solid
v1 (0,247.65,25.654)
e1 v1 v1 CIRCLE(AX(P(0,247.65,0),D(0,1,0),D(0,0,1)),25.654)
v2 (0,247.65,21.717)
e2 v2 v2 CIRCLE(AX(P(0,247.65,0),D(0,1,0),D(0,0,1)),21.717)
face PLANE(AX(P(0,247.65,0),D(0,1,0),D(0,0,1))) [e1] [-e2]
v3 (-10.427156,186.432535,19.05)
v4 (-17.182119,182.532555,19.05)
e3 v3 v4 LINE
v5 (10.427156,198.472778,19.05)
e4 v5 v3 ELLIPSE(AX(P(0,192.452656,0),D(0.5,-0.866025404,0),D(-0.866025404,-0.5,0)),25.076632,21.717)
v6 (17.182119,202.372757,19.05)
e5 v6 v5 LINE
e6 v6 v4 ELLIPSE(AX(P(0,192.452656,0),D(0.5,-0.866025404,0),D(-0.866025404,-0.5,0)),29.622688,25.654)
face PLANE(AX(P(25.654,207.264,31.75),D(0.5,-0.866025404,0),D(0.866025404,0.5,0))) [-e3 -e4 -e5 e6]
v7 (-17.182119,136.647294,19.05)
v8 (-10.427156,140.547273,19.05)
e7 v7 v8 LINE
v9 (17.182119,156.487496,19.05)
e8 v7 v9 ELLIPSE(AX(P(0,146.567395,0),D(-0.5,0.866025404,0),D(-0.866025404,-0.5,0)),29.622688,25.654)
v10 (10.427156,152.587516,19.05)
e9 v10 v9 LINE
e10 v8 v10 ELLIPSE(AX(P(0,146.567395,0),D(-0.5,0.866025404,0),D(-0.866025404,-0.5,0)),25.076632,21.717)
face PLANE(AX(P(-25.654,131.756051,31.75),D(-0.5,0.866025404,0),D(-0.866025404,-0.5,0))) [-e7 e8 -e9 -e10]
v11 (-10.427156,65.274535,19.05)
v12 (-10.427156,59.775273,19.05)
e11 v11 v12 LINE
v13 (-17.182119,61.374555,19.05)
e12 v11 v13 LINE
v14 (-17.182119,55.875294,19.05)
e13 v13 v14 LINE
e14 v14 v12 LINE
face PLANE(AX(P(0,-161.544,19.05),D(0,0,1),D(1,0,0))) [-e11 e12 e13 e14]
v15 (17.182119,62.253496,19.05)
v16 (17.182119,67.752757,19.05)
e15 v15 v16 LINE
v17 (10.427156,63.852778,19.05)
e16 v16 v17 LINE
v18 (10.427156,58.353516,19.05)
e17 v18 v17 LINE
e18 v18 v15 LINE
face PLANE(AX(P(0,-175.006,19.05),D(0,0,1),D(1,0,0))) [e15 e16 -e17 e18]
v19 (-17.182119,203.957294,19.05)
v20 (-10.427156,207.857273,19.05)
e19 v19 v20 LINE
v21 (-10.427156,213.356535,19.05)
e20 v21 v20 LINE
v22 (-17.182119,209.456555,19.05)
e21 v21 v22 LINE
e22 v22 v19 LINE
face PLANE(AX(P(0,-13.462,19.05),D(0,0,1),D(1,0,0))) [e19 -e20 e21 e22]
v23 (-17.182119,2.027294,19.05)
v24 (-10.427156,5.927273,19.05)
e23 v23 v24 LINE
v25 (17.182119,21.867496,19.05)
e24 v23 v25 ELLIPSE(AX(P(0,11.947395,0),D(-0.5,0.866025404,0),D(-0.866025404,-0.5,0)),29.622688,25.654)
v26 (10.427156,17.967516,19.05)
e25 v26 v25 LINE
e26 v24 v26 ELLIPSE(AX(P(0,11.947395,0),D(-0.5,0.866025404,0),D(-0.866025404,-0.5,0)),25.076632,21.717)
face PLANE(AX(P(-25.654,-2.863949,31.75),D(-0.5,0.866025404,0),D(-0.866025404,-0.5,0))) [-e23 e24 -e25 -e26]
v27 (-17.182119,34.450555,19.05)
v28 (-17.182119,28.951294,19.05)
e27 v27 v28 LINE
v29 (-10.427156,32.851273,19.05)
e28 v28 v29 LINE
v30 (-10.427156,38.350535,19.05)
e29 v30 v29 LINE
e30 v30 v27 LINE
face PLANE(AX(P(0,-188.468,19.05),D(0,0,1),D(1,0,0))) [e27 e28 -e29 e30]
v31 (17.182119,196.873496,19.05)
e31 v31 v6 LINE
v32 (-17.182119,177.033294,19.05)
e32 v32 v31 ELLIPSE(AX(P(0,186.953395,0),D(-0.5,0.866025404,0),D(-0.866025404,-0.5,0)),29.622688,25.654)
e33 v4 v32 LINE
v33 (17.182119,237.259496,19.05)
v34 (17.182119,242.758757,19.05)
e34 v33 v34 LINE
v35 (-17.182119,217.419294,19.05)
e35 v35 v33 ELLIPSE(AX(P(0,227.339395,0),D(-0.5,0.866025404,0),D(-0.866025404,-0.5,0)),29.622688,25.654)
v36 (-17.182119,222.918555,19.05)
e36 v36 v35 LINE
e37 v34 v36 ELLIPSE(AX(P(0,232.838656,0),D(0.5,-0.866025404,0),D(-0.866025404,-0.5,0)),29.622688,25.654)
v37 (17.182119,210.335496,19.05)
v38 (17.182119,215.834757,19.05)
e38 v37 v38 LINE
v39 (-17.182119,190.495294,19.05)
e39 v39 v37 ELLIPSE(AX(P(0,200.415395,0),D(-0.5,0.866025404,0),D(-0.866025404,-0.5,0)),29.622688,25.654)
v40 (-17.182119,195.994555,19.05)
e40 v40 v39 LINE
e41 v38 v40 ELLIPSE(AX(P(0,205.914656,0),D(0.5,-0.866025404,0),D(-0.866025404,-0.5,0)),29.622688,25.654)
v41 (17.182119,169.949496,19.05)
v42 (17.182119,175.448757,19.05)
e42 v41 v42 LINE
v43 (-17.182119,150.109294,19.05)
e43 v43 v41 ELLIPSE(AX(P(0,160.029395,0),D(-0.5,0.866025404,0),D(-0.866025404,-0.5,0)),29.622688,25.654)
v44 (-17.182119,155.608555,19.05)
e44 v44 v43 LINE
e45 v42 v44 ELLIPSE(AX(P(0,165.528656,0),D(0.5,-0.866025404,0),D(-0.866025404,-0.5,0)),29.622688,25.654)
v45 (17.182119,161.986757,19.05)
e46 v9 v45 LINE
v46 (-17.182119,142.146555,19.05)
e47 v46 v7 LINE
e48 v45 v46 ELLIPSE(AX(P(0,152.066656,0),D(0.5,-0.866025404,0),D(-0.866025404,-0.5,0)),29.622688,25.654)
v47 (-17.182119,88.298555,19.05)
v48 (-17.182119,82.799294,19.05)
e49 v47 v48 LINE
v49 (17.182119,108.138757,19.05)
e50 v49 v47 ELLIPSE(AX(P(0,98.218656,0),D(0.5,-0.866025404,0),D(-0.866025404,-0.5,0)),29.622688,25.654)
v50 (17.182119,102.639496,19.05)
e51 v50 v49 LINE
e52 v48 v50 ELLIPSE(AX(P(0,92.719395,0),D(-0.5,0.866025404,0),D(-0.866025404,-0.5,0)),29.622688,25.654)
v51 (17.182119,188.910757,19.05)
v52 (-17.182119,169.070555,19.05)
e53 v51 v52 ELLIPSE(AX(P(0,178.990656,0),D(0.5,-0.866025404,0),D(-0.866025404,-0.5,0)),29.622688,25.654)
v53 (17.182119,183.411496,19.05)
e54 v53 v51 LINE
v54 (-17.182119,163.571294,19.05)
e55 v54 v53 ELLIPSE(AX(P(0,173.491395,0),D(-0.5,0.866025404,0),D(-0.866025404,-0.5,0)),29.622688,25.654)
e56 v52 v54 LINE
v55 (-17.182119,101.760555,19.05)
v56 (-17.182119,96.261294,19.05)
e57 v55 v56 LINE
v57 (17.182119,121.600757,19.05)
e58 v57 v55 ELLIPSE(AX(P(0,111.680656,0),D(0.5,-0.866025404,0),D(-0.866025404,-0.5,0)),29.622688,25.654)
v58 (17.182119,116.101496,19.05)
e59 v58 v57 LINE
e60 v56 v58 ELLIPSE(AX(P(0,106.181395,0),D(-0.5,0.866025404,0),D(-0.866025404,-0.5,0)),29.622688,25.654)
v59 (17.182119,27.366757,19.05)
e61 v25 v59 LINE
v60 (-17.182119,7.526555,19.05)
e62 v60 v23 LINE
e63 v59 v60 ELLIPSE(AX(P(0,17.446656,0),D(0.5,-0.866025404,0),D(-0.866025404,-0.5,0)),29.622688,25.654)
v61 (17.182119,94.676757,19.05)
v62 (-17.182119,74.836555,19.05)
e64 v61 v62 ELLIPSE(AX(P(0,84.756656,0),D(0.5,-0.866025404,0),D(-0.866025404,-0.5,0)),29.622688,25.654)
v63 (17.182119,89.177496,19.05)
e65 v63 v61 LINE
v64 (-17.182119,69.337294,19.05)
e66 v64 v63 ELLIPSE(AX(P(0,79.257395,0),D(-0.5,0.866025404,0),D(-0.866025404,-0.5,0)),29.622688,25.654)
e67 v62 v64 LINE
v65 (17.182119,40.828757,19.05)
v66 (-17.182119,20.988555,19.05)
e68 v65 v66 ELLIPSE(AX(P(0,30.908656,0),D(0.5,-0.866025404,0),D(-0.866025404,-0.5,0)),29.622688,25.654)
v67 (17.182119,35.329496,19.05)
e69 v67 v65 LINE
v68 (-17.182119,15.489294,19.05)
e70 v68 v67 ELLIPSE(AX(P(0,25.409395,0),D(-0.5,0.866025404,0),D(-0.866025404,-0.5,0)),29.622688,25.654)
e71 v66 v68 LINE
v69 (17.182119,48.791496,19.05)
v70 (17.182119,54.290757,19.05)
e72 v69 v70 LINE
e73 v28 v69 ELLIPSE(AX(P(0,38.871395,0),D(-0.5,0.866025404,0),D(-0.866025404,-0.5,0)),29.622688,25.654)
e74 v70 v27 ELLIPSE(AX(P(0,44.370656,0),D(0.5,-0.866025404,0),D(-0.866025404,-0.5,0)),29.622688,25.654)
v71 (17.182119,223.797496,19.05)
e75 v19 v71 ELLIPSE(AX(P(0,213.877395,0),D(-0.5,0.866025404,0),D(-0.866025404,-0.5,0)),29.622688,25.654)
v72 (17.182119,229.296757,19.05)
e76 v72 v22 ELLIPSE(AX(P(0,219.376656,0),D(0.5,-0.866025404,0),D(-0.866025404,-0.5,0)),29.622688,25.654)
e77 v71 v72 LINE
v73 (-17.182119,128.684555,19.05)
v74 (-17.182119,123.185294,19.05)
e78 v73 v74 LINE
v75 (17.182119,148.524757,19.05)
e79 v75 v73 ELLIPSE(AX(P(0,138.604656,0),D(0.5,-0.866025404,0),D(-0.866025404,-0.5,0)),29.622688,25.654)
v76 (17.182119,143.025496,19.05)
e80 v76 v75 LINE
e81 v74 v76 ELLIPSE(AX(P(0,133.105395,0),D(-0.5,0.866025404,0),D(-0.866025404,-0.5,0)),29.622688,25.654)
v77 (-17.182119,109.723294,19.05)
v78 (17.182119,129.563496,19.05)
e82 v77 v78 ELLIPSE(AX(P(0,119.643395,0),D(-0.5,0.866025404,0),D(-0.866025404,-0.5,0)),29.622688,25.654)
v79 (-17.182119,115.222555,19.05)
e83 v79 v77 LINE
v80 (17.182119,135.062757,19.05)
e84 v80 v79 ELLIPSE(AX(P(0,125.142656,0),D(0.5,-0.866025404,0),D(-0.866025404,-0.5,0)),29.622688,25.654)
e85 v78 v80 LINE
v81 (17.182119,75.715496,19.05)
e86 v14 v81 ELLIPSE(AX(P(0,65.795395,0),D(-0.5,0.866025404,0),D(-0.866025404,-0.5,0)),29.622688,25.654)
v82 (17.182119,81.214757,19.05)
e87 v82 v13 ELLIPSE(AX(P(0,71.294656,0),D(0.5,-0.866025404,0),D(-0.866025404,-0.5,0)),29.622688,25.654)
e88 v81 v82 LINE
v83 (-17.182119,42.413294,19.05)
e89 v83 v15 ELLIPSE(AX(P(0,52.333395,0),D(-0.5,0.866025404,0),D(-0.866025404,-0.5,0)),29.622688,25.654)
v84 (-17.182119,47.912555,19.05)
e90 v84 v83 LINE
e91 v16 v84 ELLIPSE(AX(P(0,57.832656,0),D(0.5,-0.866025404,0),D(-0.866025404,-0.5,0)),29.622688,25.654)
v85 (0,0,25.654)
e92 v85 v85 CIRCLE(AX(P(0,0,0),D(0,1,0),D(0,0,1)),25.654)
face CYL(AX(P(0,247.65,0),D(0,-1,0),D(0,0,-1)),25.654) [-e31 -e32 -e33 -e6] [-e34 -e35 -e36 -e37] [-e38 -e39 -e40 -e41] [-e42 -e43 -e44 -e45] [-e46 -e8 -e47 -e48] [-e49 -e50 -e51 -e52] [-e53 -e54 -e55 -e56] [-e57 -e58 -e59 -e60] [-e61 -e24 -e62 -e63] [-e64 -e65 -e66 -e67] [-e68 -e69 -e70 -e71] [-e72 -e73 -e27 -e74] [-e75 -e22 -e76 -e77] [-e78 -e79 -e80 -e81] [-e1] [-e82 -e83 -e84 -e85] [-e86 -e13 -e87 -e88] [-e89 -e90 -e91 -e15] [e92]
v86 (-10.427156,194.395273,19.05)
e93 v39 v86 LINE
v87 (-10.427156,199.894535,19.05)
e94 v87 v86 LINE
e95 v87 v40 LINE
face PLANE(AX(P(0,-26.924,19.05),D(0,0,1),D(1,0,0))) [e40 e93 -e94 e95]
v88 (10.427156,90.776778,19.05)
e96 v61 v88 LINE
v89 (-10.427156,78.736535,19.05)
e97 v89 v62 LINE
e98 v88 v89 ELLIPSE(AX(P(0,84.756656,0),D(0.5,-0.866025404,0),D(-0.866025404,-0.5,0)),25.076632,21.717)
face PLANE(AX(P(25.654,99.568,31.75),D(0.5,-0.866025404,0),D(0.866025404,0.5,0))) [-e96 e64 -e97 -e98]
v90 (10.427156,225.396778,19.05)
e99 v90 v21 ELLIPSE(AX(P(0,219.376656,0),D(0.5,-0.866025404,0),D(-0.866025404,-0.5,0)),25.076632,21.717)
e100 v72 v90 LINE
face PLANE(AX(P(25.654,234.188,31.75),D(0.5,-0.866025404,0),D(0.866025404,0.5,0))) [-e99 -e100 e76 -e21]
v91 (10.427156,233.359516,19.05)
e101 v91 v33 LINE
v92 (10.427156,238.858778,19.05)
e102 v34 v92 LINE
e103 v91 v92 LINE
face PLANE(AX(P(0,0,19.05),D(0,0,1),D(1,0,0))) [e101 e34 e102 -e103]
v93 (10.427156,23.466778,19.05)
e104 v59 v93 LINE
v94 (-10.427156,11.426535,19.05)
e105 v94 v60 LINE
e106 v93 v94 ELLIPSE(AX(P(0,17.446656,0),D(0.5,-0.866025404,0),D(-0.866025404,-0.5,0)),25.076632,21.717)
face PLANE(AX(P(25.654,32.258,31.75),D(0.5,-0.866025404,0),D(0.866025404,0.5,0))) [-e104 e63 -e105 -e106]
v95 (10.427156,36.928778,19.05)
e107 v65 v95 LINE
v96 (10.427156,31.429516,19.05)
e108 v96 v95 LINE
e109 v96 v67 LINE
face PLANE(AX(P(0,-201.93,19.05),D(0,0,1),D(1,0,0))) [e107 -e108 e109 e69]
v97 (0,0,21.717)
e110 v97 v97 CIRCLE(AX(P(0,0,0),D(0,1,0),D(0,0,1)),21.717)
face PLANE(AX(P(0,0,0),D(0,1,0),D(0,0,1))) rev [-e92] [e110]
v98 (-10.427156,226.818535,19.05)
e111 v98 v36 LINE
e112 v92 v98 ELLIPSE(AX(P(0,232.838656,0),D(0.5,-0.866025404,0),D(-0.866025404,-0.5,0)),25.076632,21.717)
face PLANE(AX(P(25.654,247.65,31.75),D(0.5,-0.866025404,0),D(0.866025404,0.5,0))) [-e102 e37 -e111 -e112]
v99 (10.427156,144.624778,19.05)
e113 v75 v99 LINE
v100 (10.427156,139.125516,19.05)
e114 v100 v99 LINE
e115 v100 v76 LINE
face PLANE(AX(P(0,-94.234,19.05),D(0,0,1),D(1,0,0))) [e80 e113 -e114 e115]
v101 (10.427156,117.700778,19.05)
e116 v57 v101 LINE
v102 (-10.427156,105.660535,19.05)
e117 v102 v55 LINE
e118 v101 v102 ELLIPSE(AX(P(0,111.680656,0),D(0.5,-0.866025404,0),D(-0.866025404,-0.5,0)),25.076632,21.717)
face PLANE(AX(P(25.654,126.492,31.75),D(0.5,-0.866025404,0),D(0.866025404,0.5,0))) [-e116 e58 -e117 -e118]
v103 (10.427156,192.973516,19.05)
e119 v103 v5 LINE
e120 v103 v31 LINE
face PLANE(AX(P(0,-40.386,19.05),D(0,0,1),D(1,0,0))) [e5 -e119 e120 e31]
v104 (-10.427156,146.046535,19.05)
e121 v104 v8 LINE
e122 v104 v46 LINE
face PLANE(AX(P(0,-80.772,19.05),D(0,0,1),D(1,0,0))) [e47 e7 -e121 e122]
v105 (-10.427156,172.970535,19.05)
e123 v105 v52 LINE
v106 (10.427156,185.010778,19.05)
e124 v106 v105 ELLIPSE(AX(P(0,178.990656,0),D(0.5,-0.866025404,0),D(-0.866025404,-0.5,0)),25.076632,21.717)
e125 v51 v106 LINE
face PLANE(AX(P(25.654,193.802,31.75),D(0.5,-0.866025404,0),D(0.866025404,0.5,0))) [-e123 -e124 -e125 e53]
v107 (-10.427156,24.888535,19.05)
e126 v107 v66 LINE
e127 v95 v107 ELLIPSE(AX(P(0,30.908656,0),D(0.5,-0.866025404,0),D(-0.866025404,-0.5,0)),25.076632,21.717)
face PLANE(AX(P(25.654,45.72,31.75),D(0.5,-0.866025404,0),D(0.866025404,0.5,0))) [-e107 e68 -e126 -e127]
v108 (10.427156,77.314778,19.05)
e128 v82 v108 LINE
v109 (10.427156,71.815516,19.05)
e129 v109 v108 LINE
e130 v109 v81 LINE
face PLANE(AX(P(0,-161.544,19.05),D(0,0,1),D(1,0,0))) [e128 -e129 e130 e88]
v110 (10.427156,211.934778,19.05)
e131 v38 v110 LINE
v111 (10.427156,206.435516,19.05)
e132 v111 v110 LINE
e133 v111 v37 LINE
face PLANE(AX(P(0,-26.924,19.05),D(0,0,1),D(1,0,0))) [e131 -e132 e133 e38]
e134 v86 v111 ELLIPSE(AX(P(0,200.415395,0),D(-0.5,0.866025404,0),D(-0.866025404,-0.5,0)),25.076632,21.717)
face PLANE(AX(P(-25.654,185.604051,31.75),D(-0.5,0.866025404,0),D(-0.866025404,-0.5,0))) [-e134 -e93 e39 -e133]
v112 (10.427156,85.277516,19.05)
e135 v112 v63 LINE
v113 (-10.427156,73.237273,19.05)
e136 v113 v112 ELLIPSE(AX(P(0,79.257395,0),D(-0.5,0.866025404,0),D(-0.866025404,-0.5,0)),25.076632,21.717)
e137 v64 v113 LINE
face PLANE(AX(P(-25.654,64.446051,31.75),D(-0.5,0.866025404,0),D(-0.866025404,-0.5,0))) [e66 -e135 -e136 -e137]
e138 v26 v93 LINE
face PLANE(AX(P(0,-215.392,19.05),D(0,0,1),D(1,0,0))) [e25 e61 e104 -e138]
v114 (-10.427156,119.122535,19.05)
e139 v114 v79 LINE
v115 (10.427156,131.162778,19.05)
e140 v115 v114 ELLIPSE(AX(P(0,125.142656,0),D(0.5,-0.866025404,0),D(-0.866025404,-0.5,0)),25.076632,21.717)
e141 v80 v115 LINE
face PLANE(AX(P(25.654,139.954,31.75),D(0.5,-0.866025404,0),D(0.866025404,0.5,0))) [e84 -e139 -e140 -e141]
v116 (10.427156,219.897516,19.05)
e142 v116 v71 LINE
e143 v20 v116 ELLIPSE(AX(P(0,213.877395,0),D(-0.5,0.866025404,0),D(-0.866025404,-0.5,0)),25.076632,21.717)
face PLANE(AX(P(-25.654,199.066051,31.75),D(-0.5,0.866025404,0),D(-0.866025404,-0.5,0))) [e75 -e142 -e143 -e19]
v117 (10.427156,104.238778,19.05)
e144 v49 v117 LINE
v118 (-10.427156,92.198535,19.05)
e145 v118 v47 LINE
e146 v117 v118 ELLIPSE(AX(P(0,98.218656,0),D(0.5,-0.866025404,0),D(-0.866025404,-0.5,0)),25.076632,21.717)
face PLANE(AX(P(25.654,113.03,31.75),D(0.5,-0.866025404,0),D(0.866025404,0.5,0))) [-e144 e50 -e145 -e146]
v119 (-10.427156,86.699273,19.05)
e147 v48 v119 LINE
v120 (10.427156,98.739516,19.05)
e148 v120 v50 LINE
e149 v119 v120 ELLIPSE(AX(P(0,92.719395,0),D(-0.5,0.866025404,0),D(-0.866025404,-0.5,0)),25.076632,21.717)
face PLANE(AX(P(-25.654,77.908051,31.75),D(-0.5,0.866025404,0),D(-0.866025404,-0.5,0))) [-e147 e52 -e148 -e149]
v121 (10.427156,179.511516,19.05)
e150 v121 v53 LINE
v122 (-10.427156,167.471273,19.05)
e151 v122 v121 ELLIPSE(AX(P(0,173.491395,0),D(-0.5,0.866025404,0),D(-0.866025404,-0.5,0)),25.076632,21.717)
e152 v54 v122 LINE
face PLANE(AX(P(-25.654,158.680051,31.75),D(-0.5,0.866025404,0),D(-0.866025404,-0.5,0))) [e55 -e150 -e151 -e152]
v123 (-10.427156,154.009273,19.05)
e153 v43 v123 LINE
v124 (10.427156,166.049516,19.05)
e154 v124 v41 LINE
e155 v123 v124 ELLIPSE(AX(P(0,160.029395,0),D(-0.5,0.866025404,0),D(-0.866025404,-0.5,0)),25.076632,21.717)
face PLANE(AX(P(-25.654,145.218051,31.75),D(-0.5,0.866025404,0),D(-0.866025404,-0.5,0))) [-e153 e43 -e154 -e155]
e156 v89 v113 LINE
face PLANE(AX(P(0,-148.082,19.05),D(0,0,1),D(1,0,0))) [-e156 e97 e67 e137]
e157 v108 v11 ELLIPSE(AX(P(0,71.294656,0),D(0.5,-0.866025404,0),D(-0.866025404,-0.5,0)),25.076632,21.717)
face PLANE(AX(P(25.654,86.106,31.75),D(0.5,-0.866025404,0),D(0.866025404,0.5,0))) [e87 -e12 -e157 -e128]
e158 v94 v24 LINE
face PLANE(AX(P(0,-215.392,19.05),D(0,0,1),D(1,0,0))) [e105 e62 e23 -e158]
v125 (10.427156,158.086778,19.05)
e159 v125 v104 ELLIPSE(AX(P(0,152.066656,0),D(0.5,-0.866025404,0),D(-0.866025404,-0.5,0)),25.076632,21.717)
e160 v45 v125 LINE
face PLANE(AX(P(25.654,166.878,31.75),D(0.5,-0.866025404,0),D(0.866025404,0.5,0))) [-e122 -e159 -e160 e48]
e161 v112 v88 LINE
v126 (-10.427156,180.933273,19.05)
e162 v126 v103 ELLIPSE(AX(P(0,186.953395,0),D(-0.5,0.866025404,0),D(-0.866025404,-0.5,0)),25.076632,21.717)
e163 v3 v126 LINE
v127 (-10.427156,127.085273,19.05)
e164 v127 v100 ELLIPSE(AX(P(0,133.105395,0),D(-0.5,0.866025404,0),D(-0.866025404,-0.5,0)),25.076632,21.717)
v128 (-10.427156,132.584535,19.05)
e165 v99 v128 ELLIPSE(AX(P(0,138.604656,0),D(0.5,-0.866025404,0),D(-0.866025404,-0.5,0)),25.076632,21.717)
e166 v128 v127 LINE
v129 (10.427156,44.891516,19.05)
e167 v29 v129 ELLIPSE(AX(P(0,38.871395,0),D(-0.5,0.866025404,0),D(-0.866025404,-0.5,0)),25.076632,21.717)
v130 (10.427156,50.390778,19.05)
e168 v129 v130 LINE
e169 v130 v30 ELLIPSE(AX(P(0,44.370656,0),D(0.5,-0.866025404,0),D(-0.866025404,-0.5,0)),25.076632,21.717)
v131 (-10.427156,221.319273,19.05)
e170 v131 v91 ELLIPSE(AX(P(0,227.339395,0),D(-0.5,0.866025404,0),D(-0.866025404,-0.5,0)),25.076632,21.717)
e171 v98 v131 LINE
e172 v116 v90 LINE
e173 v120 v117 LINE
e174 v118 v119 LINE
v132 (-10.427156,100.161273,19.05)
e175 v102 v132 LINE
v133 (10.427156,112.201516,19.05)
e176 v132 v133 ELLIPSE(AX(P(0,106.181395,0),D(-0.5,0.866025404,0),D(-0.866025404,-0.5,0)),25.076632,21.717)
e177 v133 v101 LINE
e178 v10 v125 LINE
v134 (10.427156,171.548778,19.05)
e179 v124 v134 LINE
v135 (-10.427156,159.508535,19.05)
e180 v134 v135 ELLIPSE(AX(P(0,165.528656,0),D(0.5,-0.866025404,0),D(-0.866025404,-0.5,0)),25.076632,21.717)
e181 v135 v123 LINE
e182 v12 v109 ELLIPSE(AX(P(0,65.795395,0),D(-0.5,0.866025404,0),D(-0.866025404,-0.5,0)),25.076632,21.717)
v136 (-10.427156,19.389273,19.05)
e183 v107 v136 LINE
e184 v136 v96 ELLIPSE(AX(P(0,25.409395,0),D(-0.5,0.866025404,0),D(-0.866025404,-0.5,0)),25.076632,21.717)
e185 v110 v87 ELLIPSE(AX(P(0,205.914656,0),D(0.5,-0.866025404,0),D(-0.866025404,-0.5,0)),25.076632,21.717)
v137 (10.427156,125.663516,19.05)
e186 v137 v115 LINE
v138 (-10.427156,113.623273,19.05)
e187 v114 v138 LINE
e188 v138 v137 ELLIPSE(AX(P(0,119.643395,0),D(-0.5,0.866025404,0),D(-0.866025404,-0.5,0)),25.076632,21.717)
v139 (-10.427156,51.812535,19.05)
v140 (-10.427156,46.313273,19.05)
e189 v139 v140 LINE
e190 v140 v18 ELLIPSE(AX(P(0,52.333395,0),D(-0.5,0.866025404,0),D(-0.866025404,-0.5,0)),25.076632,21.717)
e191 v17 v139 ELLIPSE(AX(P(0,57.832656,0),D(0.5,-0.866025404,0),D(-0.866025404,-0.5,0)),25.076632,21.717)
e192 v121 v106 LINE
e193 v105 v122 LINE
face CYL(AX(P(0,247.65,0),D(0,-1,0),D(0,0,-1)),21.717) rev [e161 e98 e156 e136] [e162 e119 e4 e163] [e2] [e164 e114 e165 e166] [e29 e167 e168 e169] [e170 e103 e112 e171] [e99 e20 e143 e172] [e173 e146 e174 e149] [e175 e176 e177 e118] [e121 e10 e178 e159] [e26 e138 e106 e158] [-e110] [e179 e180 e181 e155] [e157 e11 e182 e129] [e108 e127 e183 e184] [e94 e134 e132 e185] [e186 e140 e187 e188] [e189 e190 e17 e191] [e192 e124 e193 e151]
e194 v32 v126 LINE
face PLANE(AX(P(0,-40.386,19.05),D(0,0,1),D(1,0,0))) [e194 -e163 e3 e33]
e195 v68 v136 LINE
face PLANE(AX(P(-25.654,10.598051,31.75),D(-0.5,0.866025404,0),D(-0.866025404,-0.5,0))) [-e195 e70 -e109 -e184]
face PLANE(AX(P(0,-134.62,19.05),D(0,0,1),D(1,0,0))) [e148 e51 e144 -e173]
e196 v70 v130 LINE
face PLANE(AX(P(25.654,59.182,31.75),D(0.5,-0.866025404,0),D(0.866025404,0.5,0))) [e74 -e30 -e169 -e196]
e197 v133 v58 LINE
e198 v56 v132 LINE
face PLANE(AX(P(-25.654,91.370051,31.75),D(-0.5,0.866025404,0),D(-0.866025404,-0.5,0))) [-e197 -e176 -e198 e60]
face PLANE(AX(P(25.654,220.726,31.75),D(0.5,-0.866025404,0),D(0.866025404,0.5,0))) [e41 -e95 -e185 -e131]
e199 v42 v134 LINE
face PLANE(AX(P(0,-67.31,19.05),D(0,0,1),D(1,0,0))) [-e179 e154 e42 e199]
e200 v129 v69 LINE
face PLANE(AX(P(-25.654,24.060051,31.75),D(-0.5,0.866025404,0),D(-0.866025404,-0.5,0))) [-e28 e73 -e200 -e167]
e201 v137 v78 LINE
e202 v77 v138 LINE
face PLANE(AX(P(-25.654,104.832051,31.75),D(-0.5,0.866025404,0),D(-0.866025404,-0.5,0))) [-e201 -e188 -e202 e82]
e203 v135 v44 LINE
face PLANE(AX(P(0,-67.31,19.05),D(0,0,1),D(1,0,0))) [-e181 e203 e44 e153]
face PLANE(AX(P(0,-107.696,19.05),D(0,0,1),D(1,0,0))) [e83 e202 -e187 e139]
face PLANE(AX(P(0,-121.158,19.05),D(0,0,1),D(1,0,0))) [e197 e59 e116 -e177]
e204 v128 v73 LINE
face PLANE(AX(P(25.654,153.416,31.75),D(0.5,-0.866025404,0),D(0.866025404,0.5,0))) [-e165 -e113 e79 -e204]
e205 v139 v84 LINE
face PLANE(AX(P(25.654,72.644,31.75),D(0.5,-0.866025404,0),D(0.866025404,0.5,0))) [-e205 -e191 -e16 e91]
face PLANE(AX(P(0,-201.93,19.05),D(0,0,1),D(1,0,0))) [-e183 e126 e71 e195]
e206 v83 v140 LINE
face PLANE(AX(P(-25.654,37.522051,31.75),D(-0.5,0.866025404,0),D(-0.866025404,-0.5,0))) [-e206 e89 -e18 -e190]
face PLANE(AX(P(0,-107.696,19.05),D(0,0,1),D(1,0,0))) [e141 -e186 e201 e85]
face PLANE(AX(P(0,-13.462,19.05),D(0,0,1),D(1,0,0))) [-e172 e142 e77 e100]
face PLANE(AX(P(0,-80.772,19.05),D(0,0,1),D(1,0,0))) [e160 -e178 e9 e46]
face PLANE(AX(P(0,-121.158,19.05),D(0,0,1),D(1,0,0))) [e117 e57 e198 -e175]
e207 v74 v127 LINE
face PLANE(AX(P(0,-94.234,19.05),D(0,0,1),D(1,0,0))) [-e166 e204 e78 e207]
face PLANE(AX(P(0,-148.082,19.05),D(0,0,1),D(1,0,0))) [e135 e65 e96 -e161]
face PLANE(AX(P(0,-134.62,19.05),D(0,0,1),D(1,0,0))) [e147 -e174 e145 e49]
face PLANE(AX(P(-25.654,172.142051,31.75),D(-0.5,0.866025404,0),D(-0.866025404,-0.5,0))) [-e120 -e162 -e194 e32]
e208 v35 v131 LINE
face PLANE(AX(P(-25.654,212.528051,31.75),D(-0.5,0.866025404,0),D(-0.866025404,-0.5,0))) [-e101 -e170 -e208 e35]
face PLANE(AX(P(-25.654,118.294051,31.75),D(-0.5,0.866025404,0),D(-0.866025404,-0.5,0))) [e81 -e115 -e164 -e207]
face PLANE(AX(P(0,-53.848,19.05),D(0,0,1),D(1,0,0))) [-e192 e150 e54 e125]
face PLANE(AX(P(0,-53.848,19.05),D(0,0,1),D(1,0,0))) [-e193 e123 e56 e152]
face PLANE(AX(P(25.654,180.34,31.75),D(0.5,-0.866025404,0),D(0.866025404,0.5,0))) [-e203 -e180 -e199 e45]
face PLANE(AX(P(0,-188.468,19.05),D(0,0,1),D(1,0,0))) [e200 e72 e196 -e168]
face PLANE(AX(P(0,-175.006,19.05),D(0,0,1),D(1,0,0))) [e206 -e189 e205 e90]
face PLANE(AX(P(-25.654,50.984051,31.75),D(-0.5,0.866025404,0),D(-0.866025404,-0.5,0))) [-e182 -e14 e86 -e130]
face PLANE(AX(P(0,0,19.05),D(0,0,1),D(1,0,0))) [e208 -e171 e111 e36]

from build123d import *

# Parameters (mm, degrees)
SKETCH1_R           = 25.654
SKETCH1_R_2         = 21.717
BOSS_EXTRUDE1_DEPTH = 247.65
CUT_EXTRUDE1_START  = 19.05
CUT_EXTRUDE1_DEPTH  = 12.7
LPATTERN1_COUNT     = 17
LPATTERN1_PITCH     = 13.462


with BuildPart() as part:
    # Sketch1 → Boss-Extrude1 (new body)
    with BuildSketch(Plane(origin=(0, 0, 0), x_dir=(1, 0, 0), z_dir=(0, 1, 0))):
        Circle(SKETCH1_R)
        Circle(SKETCH1_R_2, mode=Mode.SUBTRACT)
    extrude(amount=BOSS_EXTRUDE1_DEPTH)

    # Sketch2 → Cut-Extrude1 (cut)
    with BuildSketch(Plane.XY.offset(CUT_EXTRUDE1_START)):
        Polygon((-28.03525, 216.65249706), (-25.654, 212.528051074), (28.03525, 243.525554014), (25.654, 247.65), align=None)
    cut_extrude1 = extrude(amount=CUT_EXTRUDE1_DEPTH, mode=Mode.SUBTRACT)

    # LPattern1: Cut-Extrude1 ×17
    with Locations(*[(0, -i * LPATTERN1_PITCH, 0) for i in range(1, LPATTERN1_COUNT)]):
        add(cut_extrude1, mode=Mode.SUBTRACT)


solid = part.part
